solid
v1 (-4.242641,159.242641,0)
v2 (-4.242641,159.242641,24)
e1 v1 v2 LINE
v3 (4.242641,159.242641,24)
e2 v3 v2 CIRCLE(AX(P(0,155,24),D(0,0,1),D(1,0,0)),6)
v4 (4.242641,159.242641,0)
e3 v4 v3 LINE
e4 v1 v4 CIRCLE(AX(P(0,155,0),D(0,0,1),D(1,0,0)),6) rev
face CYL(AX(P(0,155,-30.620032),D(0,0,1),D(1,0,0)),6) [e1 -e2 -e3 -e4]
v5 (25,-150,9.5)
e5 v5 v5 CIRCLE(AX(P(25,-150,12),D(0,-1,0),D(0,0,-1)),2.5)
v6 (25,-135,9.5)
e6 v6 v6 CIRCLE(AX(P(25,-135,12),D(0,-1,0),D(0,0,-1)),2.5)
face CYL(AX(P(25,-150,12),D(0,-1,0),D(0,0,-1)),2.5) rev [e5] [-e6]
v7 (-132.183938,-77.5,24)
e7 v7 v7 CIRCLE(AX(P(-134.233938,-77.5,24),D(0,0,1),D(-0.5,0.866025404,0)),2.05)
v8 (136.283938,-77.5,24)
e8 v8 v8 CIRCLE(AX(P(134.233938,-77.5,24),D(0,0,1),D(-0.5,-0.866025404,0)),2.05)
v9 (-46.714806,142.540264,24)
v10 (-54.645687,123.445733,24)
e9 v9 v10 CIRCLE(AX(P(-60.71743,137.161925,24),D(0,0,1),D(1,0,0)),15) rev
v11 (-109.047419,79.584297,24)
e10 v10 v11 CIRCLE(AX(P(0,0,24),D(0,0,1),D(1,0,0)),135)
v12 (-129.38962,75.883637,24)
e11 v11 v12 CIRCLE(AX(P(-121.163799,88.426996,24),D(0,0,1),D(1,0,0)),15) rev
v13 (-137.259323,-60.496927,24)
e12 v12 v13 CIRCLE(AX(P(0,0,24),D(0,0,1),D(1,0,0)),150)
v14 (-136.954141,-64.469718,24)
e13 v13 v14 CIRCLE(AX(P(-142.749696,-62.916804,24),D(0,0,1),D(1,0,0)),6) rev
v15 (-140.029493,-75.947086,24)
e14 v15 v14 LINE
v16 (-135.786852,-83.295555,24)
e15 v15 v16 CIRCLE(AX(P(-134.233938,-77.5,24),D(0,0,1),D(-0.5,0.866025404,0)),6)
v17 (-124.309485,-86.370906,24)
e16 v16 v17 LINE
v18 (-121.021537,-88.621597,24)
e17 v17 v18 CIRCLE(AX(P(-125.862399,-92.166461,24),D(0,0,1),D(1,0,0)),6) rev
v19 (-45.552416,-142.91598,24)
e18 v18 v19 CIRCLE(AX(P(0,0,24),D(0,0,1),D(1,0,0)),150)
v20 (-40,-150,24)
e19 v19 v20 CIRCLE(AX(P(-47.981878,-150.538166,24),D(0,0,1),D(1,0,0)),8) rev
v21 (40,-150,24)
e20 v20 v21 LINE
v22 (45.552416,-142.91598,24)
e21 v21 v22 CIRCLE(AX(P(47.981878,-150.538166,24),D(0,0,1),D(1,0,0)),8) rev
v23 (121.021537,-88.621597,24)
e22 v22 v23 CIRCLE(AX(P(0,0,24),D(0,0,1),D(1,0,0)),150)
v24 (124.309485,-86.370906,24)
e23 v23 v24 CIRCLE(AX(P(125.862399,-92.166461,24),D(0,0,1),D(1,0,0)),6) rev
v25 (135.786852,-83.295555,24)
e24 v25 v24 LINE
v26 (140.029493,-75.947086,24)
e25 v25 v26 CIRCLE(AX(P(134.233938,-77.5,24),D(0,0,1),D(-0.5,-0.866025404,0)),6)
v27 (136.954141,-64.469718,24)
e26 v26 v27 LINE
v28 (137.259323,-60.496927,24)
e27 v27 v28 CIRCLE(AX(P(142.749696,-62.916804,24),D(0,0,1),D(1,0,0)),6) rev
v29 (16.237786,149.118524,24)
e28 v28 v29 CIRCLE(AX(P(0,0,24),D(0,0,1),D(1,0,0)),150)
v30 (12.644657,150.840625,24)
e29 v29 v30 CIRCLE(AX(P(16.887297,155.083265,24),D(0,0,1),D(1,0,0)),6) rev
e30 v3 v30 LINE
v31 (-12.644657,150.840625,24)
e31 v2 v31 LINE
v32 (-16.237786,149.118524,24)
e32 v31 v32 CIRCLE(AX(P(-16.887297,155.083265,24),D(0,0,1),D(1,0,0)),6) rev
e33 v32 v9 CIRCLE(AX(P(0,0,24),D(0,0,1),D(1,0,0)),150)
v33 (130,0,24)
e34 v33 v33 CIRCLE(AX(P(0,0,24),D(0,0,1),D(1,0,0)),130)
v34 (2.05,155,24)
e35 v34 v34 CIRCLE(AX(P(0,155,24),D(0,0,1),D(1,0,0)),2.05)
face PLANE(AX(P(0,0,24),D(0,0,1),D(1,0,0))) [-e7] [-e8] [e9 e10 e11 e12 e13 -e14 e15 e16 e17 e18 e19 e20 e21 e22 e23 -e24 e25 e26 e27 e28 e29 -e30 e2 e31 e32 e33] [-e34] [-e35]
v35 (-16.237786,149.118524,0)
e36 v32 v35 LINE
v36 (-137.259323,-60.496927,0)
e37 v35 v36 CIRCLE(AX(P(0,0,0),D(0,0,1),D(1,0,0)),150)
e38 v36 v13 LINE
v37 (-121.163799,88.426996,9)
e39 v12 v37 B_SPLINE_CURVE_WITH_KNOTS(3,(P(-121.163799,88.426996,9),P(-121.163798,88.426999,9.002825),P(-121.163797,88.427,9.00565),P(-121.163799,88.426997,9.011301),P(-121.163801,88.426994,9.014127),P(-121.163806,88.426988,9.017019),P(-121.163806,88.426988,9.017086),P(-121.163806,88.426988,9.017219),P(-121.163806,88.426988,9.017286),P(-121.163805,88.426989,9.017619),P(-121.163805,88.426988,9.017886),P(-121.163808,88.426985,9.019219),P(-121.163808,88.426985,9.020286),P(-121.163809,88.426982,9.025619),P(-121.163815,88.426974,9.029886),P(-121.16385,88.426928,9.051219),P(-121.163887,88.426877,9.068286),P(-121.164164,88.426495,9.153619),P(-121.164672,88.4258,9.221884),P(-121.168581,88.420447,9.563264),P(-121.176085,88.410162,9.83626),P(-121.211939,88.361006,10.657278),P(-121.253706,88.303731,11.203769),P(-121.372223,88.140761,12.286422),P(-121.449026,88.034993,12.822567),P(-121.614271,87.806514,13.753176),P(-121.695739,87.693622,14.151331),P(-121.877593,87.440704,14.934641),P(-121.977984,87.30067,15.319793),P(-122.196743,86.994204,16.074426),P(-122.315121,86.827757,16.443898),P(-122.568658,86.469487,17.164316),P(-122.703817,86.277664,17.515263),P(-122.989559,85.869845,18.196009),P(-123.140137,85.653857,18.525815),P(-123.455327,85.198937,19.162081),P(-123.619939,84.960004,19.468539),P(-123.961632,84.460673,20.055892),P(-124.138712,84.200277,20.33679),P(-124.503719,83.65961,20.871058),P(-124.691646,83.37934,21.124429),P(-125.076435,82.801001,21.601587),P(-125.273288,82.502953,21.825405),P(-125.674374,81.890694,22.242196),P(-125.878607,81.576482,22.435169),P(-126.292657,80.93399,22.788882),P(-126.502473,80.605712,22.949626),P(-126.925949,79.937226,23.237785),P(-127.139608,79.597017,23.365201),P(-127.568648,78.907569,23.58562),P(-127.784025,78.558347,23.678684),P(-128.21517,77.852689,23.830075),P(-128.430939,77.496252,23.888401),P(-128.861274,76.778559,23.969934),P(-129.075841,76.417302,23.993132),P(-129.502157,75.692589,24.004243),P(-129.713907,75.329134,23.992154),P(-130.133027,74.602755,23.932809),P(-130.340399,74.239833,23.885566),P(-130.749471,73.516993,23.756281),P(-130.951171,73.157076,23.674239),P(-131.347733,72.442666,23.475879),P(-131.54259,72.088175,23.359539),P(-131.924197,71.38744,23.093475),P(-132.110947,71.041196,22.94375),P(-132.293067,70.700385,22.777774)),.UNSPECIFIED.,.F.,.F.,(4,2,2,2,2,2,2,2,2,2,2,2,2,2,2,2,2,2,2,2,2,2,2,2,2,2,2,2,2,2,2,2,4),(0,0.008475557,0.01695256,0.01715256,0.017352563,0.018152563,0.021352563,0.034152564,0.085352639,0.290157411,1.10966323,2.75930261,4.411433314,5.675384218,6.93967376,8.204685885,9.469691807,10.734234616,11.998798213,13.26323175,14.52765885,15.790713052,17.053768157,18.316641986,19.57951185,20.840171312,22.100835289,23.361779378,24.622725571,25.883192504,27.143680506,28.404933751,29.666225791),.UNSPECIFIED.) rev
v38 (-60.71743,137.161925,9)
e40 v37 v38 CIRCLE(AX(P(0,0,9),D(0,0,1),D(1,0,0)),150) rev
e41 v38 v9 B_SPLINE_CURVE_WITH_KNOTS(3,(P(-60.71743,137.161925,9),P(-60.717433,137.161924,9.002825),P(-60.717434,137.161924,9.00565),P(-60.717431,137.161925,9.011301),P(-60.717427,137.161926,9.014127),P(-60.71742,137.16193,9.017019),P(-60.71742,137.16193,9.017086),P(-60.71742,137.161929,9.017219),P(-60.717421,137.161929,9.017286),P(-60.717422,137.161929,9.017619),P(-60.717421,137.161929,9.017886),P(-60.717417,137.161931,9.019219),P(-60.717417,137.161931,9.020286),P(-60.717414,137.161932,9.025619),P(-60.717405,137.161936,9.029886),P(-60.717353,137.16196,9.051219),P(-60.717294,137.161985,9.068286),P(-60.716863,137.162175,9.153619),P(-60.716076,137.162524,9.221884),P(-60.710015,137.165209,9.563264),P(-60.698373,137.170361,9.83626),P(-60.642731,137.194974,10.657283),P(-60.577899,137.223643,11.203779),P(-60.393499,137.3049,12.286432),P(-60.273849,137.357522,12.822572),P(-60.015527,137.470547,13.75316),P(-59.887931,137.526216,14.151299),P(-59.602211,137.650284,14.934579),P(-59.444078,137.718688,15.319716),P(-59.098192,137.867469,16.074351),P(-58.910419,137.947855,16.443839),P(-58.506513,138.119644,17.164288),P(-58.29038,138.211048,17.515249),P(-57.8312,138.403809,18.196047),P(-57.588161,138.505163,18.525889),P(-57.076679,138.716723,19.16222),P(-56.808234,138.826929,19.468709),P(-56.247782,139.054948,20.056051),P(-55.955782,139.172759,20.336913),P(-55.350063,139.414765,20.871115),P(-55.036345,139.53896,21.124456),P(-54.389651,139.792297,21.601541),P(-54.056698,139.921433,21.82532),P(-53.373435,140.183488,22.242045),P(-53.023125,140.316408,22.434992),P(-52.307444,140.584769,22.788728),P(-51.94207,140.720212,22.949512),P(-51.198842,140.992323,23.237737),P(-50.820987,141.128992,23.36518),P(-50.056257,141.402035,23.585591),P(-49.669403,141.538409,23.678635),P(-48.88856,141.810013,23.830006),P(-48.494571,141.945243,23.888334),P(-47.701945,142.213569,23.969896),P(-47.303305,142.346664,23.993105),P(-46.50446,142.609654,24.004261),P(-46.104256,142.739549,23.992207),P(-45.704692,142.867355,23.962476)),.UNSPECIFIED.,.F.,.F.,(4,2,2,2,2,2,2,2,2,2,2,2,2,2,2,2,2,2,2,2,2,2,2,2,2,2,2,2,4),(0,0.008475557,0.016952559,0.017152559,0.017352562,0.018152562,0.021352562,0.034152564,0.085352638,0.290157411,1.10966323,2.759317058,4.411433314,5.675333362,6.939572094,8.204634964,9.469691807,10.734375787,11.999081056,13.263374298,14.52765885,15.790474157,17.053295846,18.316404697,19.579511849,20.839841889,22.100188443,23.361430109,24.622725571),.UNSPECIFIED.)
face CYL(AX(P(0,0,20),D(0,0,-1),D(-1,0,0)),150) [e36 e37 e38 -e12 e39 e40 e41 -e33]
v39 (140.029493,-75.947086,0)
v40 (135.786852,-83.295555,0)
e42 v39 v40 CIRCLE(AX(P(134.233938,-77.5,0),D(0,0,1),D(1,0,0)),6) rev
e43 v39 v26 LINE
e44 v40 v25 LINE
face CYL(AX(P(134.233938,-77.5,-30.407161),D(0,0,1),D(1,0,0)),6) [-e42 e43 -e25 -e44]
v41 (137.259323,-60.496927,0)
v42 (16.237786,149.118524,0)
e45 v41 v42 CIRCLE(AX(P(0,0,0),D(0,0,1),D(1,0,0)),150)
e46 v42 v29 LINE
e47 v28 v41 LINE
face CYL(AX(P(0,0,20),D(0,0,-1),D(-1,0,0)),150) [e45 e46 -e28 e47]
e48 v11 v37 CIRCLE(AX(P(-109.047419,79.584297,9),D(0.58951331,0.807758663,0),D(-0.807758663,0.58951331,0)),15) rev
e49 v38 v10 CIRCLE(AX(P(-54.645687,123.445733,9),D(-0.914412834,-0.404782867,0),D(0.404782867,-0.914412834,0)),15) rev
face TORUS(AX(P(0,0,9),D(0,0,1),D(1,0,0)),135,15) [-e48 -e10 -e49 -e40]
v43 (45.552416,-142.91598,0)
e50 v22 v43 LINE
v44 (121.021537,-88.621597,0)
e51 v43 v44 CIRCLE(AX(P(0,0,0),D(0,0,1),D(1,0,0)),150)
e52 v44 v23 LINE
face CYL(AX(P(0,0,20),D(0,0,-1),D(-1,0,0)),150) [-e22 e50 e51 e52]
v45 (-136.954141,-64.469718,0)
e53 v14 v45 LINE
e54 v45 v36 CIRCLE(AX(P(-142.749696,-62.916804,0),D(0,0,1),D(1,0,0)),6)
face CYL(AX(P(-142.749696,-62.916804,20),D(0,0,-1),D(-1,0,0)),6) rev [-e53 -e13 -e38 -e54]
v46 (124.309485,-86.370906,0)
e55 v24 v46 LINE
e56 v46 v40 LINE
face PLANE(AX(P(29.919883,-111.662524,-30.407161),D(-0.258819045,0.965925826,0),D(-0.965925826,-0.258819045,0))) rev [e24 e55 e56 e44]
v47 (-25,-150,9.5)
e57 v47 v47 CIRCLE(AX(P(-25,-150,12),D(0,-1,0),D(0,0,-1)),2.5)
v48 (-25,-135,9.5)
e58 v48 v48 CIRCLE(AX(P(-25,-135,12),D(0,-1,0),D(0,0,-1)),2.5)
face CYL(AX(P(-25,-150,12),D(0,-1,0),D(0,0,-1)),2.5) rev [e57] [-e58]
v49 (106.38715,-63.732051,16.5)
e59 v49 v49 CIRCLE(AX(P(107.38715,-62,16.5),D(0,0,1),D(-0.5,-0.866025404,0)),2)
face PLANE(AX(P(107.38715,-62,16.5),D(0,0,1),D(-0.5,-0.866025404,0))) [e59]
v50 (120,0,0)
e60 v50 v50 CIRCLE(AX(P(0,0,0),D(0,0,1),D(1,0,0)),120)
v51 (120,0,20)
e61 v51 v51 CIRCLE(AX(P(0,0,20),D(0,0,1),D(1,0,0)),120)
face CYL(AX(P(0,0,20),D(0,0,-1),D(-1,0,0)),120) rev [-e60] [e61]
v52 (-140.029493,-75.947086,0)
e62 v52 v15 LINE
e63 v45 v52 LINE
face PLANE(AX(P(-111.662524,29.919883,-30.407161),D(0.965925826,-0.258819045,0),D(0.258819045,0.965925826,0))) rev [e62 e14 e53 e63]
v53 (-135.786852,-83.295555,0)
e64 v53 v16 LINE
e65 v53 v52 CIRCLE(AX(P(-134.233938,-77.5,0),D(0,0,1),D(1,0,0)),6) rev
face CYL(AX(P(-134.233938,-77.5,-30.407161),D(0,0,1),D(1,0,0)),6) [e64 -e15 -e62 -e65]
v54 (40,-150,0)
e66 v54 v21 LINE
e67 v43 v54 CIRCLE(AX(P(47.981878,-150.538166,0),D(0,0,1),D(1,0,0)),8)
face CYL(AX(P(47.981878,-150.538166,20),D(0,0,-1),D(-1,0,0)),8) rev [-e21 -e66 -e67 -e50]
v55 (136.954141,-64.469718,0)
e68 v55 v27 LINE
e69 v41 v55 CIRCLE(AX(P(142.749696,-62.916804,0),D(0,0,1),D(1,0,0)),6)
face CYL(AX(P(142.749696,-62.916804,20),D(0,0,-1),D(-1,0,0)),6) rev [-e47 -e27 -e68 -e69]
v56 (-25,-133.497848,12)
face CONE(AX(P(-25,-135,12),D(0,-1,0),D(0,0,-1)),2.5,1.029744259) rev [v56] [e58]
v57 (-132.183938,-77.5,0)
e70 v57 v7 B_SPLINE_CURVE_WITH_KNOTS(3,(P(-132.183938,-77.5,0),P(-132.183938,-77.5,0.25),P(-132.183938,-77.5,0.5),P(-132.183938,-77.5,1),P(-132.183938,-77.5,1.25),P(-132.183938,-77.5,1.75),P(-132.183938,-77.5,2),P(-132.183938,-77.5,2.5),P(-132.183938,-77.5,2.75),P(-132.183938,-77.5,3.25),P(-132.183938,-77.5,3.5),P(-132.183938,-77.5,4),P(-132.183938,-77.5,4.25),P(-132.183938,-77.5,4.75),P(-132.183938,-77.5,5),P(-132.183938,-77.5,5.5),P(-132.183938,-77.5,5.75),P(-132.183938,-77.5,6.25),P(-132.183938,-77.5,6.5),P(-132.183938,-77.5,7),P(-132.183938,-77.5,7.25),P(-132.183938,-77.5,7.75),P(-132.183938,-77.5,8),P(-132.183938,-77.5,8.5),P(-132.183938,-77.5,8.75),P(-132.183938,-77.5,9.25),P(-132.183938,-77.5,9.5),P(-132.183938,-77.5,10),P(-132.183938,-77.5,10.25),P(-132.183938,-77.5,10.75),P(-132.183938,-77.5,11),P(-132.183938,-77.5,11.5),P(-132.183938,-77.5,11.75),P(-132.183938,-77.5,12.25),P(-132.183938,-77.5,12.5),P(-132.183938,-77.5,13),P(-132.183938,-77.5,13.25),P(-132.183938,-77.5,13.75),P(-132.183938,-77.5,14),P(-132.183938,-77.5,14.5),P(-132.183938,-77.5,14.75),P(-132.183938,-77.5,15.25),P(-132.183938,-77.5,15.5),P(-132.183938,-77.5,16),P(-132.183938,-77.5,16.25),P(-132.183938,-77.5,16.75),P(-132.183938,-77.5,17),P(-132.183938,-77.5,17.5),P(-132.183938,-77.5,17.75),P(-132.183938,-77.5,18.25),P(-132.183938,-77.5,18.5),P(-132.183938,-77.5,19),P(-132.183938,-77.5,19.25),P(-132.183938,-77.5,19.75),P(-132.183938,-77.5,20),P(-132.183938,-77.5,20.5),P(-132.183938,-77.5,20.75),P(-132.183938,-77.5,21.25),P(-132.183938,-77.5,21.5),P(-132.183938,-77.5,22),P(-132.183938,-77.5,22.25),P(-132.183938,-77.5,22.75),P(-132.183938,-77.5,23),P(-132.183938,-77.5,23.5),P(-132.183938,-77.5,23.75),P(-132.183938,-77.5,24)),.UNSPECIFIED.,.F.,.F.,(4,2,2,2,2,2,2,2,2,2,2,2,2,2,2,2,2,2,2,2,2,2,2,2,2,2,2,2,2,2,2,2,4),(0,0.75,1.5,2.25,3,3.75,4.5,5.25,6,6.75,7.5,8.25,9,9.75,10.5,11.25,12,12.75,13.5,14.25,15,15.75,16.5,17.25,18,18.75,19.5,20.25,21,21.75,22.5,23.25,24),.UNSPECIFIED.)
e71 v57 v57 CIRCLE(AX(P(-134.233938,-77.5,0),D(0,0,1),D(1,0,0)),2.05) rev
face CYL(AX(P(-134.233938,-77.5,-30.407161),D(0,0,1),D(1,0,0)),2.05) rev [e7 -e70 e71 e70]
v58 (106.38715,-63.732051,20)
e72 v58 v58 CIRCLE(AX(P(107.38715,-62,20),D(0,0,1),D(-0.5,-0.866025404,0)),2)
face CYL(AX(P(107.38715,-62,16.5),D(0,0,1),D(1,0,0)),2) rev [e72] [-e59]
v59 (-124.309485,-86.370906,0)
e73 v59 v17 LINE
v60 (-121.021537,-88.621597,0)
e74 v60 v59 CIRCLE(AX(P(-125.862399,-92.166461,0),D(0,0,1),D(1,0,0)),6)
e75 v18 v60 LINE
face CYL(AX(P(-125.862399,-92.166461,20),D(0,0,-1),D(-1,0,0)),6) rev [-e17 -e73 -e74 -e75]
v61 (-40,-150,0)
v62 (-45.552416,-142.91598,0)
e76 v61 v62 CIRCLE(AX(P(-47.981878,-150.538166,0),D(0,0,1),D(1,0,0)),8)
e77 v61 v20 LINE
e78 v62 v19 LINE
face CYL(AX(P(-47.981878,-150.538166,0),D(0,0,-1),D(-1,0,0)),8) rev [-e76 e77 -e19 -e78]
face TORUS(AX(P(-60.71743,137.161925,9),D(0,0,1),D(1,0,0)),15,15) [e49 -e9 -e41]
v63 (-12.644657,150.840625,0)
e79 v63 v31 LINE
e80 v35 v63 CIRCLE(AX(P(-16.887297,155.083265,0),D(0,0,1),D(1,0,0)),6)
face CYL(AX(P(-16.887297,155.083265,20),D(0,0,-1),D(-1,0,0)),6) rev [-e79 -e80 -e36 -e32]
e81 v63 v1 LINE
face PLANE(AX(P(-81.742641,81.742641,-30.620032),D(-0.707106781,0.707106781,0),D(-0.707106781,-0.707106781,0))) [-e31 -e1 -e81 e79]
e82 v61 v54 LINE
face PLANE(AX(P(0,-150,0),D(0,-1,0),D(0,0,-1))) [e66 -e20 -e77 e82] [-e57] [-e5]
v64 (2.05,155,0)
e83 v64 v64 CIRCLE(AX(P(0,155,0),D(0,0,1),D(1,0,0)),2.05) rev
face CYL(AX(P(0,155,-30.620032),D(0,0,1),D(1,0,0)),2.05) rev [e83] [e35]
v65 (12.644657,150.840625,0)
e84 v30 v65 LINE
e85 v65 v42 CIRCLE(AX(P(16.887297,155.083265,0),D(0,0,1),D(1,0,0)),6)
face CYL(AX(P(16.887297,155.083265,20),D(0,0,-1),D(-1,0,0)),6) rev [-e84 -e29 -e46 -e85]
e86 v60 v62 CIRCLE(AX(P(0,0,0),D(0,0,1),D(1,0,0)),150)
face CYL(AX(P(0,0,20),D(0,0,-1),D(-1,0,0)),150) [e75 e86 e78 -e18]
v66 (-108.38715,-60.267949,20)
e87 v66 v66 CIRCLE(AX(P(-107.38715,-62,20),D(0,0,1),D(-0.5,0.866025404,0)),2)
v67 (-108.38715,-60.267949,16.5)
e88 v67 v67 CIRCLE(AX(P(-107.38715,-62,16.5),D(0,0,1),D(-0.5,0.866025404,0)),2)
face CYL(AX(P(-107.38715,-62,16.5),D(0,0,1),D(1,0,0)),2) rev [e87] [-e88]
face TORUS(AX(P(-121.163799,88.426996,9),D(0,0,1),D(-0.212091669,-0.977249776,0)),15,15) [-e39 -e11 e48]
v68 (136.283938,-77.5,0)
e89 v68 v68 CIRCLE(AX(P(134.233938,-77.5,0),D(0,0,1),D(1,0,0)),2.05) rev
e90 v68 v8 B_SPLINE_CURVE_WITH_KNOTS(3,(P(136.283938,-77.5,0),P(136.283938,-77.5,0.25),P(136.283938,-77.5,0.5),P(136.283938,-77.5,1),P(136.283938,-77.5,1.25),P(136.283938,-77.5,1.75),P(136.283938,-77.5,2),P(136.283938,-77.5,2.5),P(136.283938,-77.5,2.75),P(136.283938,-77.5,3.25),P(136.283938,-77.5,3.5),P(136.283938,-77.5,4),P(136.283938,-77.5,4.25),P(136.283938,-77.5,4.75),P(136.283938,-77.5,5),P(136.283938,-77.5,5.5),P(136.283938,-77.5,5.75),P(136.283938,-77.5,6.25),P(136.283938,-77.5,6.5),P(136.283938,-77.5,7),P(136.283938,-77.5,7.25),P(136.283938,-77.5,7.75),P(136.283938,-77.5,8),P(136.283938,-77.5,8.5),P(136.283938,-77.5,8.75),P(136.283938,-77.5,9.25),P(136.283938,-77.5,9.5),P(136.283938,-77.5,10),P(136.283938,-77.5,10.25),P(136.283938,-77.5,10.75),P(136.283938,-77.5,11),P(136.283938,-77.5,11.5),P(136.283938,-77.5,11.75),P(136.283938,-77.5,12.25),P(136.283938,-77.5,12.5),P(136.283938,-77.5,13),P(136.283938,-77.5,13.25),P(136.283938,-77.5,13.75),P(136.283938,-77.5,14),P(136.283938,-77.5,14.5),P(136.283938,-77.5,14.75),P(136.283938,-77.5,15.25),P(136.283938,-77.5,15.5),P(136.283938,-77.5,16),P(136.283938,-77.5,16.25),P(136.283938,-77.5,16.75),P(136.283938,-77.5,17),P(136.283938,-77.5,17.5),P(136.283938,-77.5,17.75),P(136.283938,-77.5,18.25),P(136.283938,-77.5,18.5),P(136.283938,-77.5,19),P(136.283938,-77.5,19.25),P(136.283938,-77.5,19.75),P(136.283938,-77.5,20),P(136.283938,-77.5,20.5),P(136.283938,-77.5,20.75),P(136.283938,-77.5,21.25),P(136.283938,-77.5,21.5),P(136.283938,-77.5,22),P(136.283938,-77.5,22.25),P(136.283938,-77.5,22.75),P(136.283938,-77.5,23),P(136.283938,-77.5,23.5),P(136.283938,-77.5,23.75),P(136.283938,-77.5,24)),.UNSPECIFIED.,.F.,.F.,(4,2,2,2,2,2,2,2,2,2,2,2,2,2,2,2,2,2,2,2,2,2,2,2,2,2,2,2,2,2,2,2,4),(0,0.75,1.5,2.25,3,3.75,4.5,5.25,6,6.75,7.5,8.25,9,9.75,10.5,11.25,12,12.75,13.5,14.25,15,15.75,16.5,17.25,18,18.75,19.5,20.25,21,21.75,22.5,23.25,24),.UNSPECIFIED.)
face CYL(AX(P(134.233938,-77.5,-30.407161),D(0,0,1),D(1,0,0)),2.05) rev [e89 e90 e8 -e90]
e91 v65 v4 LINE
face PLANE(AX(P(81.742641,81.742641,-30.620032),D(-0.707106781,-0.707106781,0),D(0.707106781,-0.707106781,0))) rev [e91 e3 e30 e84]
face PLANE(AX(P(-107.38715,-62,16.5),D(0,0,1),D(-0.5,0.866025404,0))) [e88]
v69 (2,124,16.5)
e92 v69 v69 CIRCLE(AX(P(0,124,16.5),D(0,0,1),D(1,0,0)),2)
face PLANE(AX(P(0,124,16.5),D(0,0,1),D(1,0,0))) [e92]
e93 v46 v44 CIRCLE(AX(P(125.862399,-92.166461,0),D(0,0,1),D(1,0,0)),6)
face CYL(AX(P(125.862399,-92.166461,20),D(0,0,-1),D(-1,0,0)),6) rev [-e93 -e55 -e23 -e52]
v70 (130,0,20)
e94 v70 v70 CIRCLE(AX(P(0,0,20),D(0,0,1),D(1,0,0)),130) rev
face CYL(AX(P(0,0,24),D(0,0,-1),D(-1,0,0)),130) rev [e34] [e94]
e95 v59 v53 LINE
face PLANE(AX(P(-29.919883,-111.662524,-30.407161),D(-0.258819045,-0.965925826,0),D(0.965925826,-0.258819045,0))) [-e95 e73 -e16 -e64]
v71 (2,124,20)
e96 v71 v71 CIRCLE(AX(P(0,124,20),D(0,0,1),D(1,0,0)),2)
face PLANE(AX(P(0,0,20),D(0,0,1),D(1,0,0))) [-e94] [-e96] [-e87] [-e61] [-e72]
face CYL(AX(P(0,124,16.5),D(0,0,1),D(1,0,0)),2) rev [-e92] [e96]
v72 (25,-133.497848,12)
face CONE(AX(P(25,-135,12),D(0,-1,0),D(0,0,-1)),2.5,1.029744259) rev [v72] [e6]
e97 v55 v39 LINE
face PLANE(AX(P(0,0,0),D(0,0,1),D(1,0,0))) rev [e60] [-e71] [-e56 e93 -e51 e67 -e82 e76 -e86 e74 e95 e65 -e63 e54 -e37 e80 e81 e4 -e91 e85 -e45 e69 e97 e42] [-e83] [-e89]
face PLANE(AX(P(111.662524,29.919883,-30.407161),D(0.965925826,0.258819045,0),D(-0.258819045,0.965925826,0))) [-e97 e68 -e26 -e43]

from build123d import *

# Parameters (mm, degrees)
SKETCH1_R                 = 150.00000000000003
SKETCH1_R_2               = 120
BOSS_EXTRUDE1_DEPTH       = 20
SKETCH2_R                 = 2.0000000000000018
CUT_EXTRUDE1_DEPTH        = 3.5
CIRPATTERN1_COUNT         = 3
SKETCH8_R                 = 150.00000000000006
SKETCH8_R_2               = 130
BOSS_EXTRUDE2_DEPTH       = 4
SPLIT1_SURFACE_1_BACK     = 425.942
SPLIT1_SURFACE_1_DEPTH    = 851.884
SPLIT1_SURFACE_2_BACK     = 425.942
SPLIT1_SURFACE_2_DEPTH    = 851.884
FILLET1_R                 = 15
SKETCH9_R                 = 2.049999999999871
BOSS_EXTRUDE3_DEPTH       = 24
FILLET2_R                 = 6
CIRPATTERN2_COUNT         = 3
FILLET2_OF_CIRPATTERN2_R  = 6
BOSS_EXTRUDE6_REACH       = 348.117
BOSS_EXTRUDE6_END_RADIUS  = 150.00000000000003
FILLET5_R                 = 8
M6X1_0_TAPPED_HOLE1_D     = 5
M6X1_0_TAPPED_HOLE1_DEPTH = 15
M6X1_0_TAPPED_HOLE1_TIP   = 1.5021515475689007


with BuildPart() as part:
    # Sketch1 → Boss-Extrude1 (new body)
    with BuildSketch(Plane.XY):
        Circle(SKETCH1_R)
        Circle(SKETCH1_R_2, mode=Mode.SUBTRACT)
    extrude(amount=BOSS_EXTRUDE1_DEPTH)

    # Sketch2 → Cut-Extrude1 (cut)
    with BuildSketch(Plane.XY.offset(20)):
        with Locations((0, 124)):
            Circle(SKETCH2_R)
    cut_extrude1 = extrude(amount=-CUT_EXTRUDE1_DEPTH, mode=Mode.SUBTRACT)

    # CirPattern1: Cut-Extrude1 ×3 about axis
    cirpattern1_axis = Axis((-4.94e-15, -7.48e-15, 0), (0, 0, 1))
    for i in range(1, CIRPATTERN1_COUNT):
        add(cut_extrude1.rotate(cirpattern1_axis, i * 360 / CIRPATTERN1_COUNT), mode=Mode.SUBTRACT)

    # Sketch8 → Boss-Extrude2 (add)
    with BuildSketch(Plane.XY.offset(20)):
        Circle(SKETCH8_R)
        Circle(SKETCH8_R_2, mode=Mode.SUBTRACT)
    extrude(amount=BOSS_EXTRUDE2_DEPTH)


with BuildPart() as body_2:
    # Split1: the piece behind the surface
    add(part.part)
    # Split1 surface: a surface, the sketch's curves swept straight by 851.884 mm
    with BuildLine(Plane.XY.offset(20).offset(-SPLIT1_SURFACE_1_BACK), mode=Mode.PRIVATE) as split1_surface_1_path:
        Line((-60.71743008822855, 137.16192505021607), (0, 0))
        Line((0, 0), (-121.16379943401968, 88.42699648134986))
    split1_surface_1 = Shell.extrude(split1_surface_1_path.wire(), (0 * SPLIT1_SURFACE_1_DEPTH, 0 * SPLIT1_SURFACE_1_DEPTH, 1 * SPLIT1_SURFACE_1_DEPTH))
    split(bisect_by=split1_surface_1, keep=Keep.BOTTOM)

    # Fillet1
    fillet1_edges = [body_2.edges().sort_by_distance(p)[0] for p in [
        (-94.14865229404315, 116.77341851301341, 24),
    ]]
    fillet(fillet1_edges, radius=FILLET1_R)


with BuildPart() as part_1:
    add(part.part)

    # Split1: split by a surface, the side it looks to stays
    # Split1 surface: a surface, the sketch's curves swept straight by 851.884 mm
    with BuildLine(Plane.XY.offset(20).offset(-SPLIT1_SURFACE_2_BACK), mode=Mode.PRIVATE) as split1_surface_2_path:
        Line((-60.71743008822855, 137.16192505021607), (0, 0))
        Line((0, 0), (-121.16379943401968, 88.42699648134986))
    split1_surface_2 = Shell.extrude(split1_surface_2_path.wire(), (0 * SPLIT1_SURFACE_2_DEPTH, 0 * SPLIT1_SURFACE_2_DEPTH, 1 * SPLIT1_SURFACE_2_DEPTH))
    split(bisect_by=split1_surface_2, keep=Keep.TOP)

    # Sketch6 → Cut-Revolve2 (revolve, cut)
    with BuildSketch(Plane(origin=(0, 0, 0), x_dir=(0, 0, 1), z_dir=(-0.914412833668107, -0.40478286725485696, 0))):
        with BuildLine():
            Line((24, 135.00000000000006), (24, 150.00000000000006))
            Line((24, 150.00000000000006), (9, 150.00000000000006))
            ThreePointArc((9.000000000000004, 150.00000000000006), (19.606601717798213, 145.60660171779824), (23.999999999999993, 135.00000000000003))
        make_face()
    cut_revolve2 = revolve(axis=Axis((-60.71743008822857, 137.1619250502161, 24), (0, 0, -1)), mode=Mode.SUBTRACT)

    # Mirror1: Cut-Revolve2 across plane
    add(cut_revolve2.mirror(Plane(origin=(0, 0, 0), x_dir=(0, 0, 1), z_dir=(-0.7784894567534315, -0.6276576819602762, 0))), mode=Mode.SUBTRACT)


with BuildPart() as body_2_1:
    add(body_2.part)

    # Combine1: union part
    add(part_1.part)

    # Sketch9 → Boss-Extrude3 (add)
    # profile 1 of 3: a face of its own
    with BuildSketch(Plane.XY.offset(24)):
        with BuildLine():
            ThreePointArc((-3.262499377045517, 149.96451612903218), (-5.966798192877617, 154.36966728986033), (-4.24264068711927, 159.2426406871193))
            Line((-4.242640687119266, 159.2426406871193), (-14.15461886744679, 149.33066250679175))
            ThreePointArc((-14.1546188674468, 149.33066250679167), (-8.714324103983273, 149.7466545716823), (-3.2624993770454083, 149.9645161290323))
        make_face()
    # profile 2 of 3: a face of its own
    with BuildSketch(Plane.XY.offset(24)):
        with BuildLine():
            Line((14.154618867446969, 149.3306625067917), (4.242640687119273, 159.24264068711932))
            ThreePointArc((4.242640687119273, 159.24264068711932), (5.543277195067717, 157.29610059419056), (6, 155.00000000000003))
            ThreePointArc((6, 155.00000000000003), (5.27138483997677, 152.13425369774941), (3.262499377045641, 149.96451612903223))
            ThreePointArc((3.262499377045714, 149.96451612903223), (8.714324103983444, 149.7466545716823), (14.154618867446963, 149.33066250679167))
        make_face()
    # profile 3 of 3: a face of its own
    with BuildSketch(Plane.XY.offset(24)):
        with BuildLine():
            ThreePointArc((4.242640687119273, 159.24264068711932), (-3.07e-15, 161), (-4.242640687119268, 159.2426406871193))
            ThreePointArc((-4.24264068711927, 159.2426406871193), (-5.966798192877617, 154.36966728986033), (-3.262499377045517, 149.96451612903218))
            ThreePointArc((-3.2624993770454083, 149.9645161290323), (1.4921e-13, 150), (3.262499377045714, 149.96451612903223))
            ThreePointArc((3.262499377045641, 149.96451612903223), (5.27138483997677, 152.13425369774941), (6, 155.00000000000003))
            ThreePointArc((6, 155.00000000000003), (5.543277195067717, 157.29610059419056), (4.242640687119273, 159.24264068711932))
        make_face()
        with Locations((1.388e-14, 155.00000000000003)):
            Circle(SKETCH9_R, mode=Mode.SUBTRACT)
    boss_extrude3 = extrude(amount=-BOSS_EXTRUDE3_DEPTH)

    # Fillet2
    fillet2_edges = [body_2_1.edges().sort_by_distance(p)[0] for p in [
        (-14.154618867446795, 149.33066250679173, 12),
        (14.154618867446967, 149.33066250679167, 12),
    ]]
    fillet(fillet2_edges, radius=FILLET2_R)

    # CirPattern2: Boss-Extrude3 ×3 about axis
    cirpattern2_axis = Axis((1.08e-15, -6.48e-15, 0), (0, 0, 1))
    for i in range(1, CIRPATTERN2_COUNT):
        add(boss_extrude3.rotate(cirpattern2_axis, i * 360 / CIRPATTERN2_COUNT))

    # Fillet2 of CirPattern2
    fillet2_of_cirpattern2_edges = [body_2_1.edges().sort_by_distance(p)[0] for p in [
        (-122.24683786111865, -86.9235907734913, 12),
        (-136.40145672856548, -62.40707173330022, 12),
        (136.4014567285654, -62.407071733300505, 12),
        (122.24683786111846, -86.92359077349151, 12),
    ]]
    fillet(fillet2_of_cirpattern2_edges, radius=FILLET2_OF_CIRPATTERN2_R)

    # Boss-Extrude6: up to this cylinder (the profile starts outside it)
    boss_extrude6_end = Plane(origin=(0, 0, 12), z_dir=(0, 0, -1)) * Cylinder(BOSS_EXTRUDE6_END_RADIUS, 997.2340000000002, mode=Mode.PRIVATE)
    # Sketch12 → Boss-Extrude6 (add, up to the surface)
    with BuildSketch(Plane(origin=(0, -150.00000000000003, 0), x_dir=(-1, 0, 0), z_dir=(0, -1, 0)), mode=Mode.PRIVATE) as boss_extrude6_sk1:
        Polygon((0, 0), (-40, -4.9e-15), (-40.00000000000001, -24), (0, -24), align=None)
    boss_extrude6_tool1 = extrude(boss_extrude6_sk1.sketch, amount=-BOSS_EXTRUDE6_REACH, mode=Mode.PRIVATE) - boss_extrude6_end
    add(boss_extrude6_tool1.solids().sort_by_distance((20, -150, 12))[0])
    # Sketch12 → Boss-Extrude6 (add, up to the surface)
    with BuildSketch(Plane(origin=(0, -150.00000000000003, 0), x_dir=(-1, 0, 0), z_dir=(0, -1, 0)), mode=Mode.PRIVATE) as boss_extrude6_sk2:
        Polygon((40, 0), (40.00000000000001, -24), (0, -24), (0, 0), align=None)
    boss_extrude6_tool2 = extrude(boss_extrude6_sk2.sketch, amount=-BOSS_EXTRUDE6_REACH, mode=Mode.PRIVATE) - boss_extrude6_end
    add(boss_extrude6_tool2.solids().sort_by_distance((-20, -150, 12))[0])

    # Fillet5
    # the kernel refuses this fillet: 8 mm, written as the material it adds along each edge
    with BuildSketch(Plane(origin=(40.00000000000015, -144.56832294800958, 24), x_dir=(0.9584597244138898, 0.2852279030467574, 0), z_dir=(0, 0, -1))) as fillet5_piece_1:
        with BuildLine():
            CenterArc((5.947542883110703, 7.998508324991874), FILLET5_R, 200.42971386414416, 68.4638241646868)
            Line((-1.5492658555665646, 5.2060436903559735), (-1.699202030340109, 5.1501943976632605))
            ThreePointArc((-1.699202030340109, 5.1501943976632605), (-0.9279864836895695, 2.5573853806904863), (-0.1533535559062191, -0.04563646448748021))
            Line((-0.1533535559062191, -0.04563646448748021), (0.00308963266655187, -0.15997016649984888))
            ThreePointArc((0.00308963266655187, -0.15997016649984888), (2.8965306248915494, -0.1320310935977963), (5.7899716171165965, -0.15997016649985063))
            Line((5.7899716171165965, -0.15997016649985063), (5.793061249783145, 1.4e-16))
        make_face()
    extrude(amount=24)
    with BuildSketch(Plane(origin=(-40.00000000000015, -144.56832294800958, 24), x_dir=(1.57e-14, -1, 0), z_dir=(0, 0, -1))) as fillet5_piece_2:
        with BuildLine():
            CenterArc((5.969842900063457, 7.98187806972569), FILLET5_R, 197.67893389575954, 68.46382416468674)
            Line((-1.652342712497161, 5.552415888979961), (-1.804786424748387, 5.503826645365045))
            ThreePointArc((-1.804786424748387, 5.503826645365045), (-0.9527178418323817, 2.738548992526119), (-0.1542062111445539, -0.04266666666667149))
            Line((-0.1542062111445539, -0.04266666666667149), (2.51e-15, -0.1599999999999966))
            ThreePointArc((2.51e-15, -0.1599999999999966), (2.7158385259952267, -0.16000000000009607), (5.420913735028992, -0.15963756139451152))
            Line((5.420913735028992, -0.15963756139451152), (5.431677051990448, 0))
        make_face()
    extrude(amount=24)

    # M6x1.0 Tapped Hole1
    with Locations(Plane(origin=(0, -150.00000000000003, 0), x_dir=(-1, 0, 0), z_dir=(0, -1, 0))):
        with Locations((-25, -12), (25, -12)):
            Hole(M6X1_0_TAPPED_HOLE1_D / 2, depth=M6X1_0_TAPPED_HOLE1_DEPTH)
            with Locations((0, 0, -(M6X1_0_TAPPED_HOLE1_DEPTH + M6X1_0_TAPPED_HOLE1_TIP / 2))):  # 118° drill point
                Cone(0, M6X1_0_TAPPED_HOLE1_D / 2, M6X1_0_TAPPED_HOLE1_TIP, mode=Mode.SUBTRACT)


solid = body_2_1.part
